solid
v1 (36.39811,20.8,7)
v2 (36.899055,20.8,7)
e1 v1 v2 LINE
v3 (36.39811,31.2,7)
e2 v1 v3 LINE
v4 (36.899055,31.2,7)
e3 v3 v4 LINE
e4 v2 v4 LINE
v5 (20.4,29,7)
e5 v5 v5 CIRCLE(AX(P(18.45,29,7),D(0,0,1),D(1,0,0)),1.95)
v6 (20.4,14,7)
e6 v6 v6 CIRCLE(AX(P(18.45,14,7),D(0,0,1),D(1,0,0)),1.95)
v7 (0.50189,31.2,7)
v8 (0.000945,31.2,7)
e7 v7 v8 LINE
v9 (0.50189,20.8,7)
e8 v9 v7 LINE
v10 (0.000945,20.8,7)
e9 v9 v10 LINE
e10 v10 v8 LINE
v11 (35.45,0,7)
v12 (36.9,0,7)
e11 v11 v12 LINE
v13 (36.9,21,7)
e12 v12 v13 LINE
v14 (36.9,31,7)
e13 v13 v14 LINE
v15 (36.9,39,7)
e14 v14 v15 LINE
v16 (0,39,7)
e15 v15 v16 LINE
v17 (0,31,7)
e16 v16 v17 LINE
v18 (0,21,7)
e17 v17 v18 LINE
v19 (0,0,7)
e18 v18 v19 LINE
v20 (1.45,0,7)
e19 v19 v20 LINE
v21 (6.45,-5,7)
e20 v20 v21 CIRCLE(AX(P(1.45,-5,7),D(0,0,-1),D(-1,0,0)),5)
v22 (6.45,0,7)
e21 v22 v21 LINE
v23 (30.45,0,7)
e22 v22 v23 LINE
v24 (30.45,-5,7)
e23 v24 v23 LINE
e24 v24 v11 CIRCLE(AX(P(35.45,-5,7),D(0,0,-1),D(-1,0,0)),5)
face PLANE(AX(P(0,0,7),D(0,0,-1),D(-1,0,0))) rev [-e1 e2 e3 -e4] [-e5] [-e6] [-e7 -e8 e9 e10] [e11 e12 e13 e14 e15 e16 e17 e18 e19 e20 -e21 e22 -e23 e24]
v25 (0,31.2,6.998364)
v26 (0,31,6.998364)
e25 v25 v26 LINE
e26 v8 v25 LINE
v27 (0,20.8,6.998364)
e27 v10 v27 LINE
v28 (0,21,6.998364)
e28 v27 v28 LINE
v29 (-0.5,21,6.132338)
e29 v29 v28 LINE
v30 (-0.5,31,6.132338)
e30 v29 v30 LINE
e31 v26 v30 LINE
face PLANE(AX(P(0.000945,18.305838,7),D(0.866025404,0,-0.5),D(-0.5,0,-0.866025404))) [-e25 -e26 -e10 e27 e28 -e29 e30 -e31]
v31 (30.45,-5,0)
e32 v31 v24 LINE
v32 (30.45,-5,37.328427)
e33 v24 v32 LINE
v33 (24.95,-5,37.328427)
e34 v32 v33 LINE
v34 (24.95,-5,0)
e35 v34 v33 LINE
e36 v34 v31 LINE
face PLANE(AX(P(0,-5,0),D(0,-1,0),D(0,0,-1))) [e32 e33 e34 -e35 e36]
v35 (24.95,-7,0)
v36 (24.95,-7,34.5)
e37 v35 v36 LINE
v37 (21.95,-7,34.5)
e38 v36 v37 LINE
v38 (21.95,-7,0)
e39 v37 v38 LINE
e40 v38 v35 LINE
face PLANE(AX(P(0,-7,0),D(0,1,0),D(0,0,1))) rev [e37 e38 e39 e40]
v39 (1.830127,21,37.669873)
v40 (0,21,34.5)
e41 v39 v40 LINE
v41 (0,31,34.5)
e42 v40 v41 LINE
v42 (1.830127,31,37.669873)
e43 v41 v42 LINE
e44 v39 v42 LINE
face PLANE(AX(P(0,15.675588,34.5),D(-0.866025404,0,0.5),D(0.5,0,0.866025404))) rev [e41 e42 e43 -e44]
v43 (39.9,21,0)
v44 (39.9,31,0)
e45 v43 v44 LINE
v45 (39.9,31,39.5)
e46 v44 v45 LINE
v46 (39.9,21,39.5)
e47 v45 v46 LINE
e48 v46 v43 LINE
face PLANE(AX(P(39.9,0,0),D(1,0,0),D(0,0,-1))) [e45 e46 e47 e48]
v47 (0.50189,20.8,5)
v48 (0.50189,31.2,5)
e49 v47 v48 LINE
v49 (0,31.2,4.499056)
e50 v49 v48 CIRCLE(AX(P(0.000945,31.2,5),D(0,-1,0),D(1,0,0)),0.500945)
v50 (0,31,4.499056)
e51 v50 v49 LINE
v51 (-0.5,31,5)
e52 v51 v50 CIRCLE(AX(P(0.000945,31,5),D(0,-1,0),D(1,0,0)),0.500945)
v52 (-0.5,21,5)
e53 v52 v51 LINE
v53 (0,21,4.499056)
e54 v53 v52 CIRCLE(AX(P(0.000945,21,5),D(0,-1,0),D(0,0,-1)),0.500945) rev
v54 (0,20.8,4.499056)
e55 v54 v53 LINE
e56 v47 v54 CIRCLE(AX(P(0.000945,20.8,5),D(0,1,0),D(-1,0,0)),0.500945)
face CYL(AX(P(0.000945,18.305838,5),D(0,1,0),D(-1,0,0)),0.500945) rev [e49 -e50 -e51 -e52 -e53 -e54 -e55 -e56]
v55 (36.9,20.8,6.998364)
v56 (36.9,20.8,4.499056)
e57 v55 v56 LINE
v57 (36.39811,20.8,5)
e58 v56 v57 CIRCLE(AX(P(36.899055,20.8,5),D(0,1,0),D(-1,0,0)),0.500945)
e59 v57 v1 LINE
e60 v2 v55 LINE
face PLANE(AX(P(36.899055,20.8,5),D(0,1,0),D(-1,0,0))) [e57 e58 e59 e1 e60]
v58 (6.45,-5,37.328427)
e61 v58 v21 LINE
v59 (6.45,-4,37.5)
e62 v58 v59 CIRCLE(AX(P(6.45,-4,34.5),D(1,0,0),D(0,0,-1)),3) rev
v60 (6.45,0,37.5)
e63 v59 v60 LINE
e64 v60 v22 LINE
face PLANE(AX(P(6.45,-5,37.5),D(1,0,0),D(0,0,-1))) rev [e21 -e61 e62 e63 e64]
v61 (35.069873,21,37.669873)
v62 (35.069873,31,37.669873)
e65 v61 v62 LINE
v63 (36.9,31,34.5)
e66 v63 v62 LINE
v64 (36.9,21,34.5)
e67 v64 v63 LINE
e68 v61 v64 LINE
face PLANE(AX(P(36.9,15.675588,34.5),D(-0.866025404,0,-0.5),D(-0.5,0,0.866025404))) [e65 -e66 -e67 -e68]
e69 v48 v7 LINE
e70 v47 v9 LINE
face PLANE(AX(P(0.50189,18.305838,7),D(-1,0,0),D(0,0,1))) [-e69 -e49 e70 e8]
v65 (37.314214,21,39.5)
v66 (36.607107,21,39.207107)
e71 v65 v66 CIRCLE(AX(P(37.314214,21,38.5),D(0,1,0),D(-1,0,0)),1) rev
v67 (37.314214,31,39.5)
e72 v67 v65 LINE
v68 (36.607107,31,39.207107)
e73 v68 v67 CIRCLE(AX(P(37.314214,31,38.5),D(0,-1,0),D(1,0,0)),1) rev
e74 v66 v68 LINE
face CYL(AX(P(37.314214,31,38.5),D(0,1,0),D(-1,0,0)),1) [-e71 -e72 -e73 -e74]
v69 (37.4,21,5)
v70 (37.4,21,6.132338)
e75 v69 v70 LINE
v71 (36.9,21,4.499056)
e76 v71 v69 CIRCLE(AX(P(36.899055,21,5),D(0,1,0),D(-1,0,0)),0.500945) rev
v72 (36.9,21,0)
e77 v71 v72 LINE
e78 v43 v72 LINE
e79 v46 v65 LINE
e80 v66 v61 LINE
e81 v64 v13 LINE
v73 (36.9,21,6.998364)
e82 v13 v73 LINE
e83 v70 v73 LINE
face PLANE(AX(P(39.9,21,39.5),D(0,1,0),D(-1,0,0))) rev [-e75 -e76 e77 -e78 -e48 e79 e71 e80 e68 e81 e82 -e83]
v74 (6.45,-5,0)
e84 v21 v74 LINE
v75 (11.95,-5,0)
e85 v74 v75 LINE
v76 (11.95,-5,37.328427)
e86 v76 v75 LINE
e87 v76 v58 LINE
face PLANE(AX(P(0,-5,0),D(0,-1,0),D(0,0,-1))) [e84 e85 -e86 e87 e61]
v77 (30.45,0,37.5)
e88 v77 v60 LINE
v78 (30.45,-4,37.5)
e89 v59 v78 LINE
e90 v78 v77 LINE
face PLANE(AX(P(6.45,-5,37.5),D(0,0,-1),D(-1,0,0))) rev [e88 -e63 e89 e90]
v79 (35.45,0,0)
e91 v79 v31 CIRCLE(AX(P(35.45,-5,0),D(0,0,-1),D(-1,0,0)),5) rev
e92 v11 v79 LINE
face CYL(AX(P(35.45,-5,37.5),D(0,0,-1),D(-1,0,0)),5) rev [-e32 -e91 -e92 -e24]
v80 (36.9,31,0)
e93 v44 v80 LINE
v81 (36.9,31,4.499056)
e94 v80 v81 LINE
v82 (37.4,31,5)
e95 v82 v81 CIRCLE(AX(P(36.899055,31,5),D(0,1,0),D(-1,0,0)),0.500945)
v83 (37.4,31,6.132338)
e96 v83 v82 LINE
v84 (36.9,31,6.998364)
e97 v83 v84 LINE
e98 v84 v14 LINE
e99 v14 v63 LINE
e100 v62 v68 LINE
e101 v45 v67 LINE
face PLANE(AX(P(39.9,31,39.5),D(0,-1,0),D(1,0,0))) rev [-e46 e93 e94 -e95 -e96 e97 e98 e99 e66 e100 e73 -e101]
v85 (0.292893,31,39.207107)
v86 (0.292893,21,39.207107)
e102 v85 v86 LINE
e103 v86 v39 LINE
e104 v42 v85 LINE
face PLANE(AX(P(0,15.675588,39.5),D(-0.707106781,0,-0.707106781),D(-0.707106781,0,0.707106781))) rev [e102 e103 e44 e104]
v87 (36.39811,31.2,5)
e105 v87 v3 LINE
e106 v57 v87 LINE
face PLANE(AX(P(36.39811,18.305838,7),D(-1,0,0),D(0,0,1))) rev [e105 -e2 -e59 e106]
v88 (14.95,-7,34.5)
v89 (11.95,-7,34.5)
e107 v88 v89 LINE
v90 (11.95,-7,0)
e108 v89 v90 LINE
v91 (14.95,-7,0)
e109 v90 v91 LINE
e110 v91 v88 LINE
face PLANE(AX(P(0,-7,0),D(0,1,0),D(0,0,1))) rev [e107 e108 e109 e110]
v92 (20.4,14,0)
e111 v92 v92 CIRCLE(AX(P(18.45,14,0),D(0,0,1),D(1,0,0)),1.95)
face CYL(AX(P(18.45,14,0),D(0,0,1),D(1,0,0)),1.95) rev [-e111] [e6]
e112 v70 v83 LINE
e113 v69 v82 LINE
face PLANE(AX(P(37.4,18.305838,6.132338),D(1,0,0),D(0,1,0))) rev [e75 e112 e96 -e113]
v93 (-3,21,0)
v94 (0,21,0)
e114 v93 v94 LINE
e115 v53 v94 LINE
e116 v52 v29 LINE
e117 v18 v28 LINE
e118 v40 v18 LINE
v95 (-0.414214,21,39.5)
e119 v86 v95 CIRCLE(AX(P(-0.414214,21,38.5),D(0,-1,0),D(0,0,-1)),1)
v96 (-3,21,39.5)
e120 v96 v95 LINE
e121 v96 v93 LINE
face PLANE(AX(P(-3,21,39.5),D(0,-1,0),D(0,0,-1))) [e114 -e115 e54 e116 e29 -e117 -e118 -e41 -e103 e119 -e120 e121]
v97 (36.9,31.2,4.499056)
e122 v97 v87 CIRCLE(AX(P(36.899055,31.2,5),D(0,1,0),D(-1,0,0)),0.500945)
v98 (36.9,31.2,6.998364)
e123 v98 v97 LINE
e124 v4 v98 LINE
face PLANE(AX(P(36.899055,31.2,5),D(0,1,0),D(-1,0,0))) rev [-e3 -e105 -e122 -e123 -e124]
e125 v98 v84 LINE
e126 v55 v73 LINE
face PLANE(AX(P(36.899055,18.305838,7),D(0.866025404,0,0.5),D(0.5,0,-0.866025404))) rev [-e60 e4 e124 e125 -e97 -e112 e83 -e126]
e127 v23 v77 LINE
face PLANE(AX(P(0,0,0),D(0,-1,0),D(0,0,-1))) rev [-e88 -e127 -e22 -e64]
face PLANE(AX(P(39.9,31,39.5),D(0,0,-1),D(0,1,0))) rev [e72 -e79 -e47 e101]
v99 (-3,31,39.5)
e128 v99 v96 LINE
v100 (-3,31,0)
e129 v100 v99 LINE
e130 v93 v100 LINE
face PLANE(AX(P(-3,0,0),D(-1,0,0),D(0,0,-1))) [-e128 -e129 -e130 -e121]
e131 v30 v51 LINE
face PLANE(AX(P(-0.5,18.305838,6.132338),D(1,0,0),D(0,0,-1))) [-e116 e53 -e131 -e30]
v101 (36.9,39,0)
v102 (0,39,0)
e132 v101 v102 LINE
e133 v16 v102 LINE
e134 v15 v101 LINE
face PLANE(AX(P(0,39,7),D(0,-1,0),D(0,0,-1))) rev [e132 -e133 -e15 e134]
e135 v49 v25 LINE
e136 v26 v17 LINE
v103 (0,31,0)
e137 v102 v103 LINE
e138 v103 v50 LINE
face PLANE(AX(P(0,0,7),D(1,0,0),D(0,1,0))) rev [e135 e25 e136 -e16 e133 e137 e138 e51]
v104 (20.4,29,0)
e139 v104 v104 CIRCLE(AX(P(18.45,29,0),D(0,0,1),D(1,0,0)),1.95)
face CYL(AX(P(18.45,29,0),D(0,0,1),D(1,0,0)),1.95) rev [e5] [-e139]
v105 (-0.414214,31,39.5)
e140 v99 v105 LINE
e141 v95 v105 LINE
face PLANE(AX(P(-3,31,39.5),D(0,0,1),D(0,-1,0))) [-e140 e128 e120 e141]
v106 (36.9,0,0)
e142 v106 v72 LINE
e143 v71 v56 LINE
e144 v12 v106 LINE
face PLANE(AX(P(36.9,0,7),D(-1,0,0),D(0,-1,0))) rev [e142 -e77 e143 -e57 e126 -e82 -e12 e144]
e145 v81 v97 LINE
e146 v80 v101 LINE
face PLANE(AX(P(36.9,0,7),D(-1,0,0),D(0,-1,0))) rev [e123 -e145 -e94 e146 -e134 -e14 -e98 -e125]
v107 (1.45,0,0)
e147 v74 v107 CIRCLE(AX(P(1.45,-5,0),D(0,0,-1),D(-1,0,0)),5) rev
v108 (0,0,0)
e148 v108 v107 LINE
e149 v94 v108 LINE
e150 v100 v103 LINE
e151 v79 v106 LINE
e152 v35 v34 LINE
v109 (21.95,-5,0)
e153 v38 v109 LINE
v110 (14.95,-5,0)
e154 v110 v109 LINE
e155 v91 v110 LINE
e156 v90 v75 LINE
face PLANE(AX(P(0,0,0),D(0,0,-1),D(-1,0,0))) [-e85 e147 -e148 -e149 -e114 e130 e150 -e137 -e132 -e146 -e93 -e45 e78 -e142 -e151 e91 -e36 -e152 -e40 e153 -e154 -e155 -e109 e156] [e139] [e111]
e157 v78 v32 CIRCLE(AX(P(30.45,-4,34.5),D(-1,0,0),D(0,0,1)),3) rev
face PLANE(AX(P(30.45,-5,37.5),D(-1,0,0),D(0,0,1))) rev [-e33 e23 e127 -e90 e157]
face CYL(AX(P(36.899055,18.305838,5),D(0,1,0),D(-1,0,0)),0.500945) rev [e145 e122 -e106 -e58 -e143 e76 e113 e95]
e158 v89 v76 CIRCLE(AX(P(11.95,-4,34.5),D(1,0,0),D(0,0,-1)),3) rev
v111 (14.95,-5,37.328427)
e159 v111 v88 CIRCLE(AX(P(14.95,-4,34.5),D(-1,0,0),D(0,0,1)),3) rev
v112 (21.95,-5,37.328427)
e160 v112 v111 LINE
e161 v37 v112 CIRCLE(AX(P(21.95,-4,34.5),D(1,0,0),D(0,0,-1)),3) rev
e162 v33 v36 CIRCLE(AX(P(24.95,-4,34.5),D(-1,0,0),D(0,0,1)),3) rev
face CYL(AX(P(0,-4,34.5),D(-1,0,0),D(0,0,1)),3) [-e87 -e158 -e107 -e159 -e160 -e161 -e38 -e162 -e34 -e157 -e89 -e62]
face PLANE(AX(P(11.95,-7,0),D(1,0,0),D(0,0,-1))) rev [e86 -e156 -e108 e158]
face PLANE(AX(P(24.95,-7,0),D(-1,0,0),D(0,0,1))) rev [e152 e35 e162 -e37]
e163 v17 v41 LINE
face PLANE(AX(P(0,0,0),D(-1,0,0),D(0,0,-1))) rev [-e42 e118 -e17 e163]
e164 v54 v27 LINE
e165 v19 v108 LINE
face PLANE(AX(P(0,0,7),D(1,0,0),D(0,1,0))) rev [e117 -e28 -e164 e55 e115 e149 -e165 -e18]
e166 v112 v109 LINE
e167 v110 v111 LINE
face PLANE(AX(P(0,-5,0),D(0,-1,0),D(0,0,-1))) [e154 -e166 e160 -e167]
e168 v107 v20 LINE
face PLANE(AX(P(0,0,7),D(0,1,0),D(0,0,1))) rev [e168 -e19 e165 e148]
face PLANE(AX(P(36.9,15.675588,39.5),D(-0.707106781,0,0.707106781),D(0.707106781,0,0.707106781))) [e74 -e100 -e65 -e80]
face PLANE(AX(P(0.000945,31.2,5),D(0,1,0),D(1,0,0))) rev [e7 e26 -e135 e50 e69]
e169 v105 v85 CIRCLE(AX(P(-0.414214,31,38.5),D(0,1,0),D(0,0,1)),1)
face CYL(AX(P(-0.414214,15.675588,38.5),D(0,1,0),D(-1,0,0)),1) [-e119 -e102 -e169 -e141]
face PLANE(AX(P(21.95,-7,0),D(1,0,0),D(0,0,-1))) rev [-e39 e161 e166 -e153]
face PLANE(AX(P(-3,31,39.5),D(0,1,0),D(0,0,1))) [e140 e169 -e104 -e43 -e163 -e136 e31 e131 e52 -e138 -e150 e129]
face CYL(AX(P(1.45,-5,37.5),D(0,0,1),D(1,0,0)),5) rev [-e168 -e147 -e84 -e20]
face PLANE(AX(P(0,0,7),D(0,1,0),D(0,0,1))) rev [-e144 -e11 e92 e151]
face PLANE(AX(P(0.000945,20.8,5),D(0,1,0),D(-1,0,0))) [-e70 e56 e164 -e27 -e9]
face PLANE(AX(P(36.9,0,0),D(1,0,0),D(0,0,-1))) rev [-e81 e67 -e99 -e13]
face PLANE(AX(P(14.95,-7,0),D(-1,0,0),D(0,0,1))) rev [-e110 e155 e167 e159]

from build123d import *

# Parameters (mm, degrees)
SKETCH_1_W          = 36.9
SKETCH_1_H          = 39
EXTRUDE_1_DEPTH     = 7
SKETCH_2_W          = 24
SKETCH_2_H          = 37.5
EXTRUDE_2_DEPTH     = 5
SKETCH_4_W          = 39.5
SKETCH_4_H          = 10
EXTRUDE_3_DEPTH     = 3
EXTRUDE_4_DEPTH     = 10
CUT_EXTRUDE_3_DEPTH = 10
CUT_EXTRUDE_START   = 0.2
CUT_EXTRUDE_4_DEPTH = 0.2
CUT_EXTRUDE_START_2 = -10
CUT_EXTRUDE_5_DEPTH = 0.2
FILLET_1_R          = 5
FILLET_2_R          = 1
MIRROR_START        = 20.8
MIRROR_4_DEPTH      = 10.4
MIRROR_START_2      = 21
MIRROR_4_2_DEPTH    = 10
FILLET_3_R          = 1
SKETCH_7_W          = 3
SKETCH_7_H          = 37.5
EXTRUDE_5_DEPTH     = 2
FILLET_4_R          = 3
SKETCH_8_R          = 1.95
CUT_EXTRUDE_6_DEPTH = 65.569807186


# Read off the part's stored shape, not the designer's step: 鏡射4
with BuildPart() as part:
    # 草圖1 → 填料-伸長1 (new body)
    with BuildSketch(Plane.XY):
        with Locations((18.45, 19.5)):
            Rectangle(SKETCH_1_W, SKETCH_1_H)
    extrude(amount=EXTRUDE_1_DEPTH)

    # 草圖2 → 填料-伸長2 (add)
    with BuildSketch(Plane.XZ):
        with Locations((18.45, 18.75)):
            Rectangle(SKETCH_2_W, SKETCH_2_H)
    extrude(amount=EXTRUDE_2_DEPTH)

    # 草圖4 → 填料-伸長3 (add)
    with BuildSketch(Plane(origin=(36.9, 0, 0), x_dir=(0, 0, -1), z_dir=(1, 0, 0))):
        with Locations((-19.75, 26)):
            Rectangle(SKETCH_4_W, SKETCH_4_H)
    extrude(amount=EXTRUDE_3_DEPTH)

    # 草圖5 → 填料-伸長4 (add)
    with BuildSketch(Plane(origin=(0, 31, 0), x_dir=(1, 0, 0), z_dir=(0, 1, 0))):
        Polygon((36.9, -39.5), (35.069872981, -37.669872981), (36.9, -34.5), align=None)
    extrude(amount=-EXTRUDE_4_DEPTH)

    # 草圖6 → 除料-伸長3 (cut)
    with BuildSketch(Plane(origin=(0, 31, 0), x_dir=(1, 0, 0), z_dir=(0, 1, 0))):
        with BuildLine():
            Line((36.398110453, -7), (36.899055226, -7))
            Line((36.899055226, -7), (37.4, -6.1323382))
            Line((37.4, -6.1323382), (37.4, -5))
            ThreePointArc((37.4, -5), (36.899055226, -4.499055226), (36.398110453, -5))
            Line((36.398110453, -5), (36.398110453, -7))
        make_face()
    extrude(amount=-CUT_EXTRUDE_3_DEPTH, mode=Mode.SUBTRACT)

    # 草圖6<2> → 除料-伸長4 (cut)
    with BuildSketch(Plane(origin=(0, 31, 0), x_dir=(1, 0, 0), z_dir=(0, 1, 0)).offset(CUT_EXTRUDE_START)):
        with BuildLine():
            Line((36.398110453, -7), (36.899055226, -7))
            Line((36.899055226, -7), (37.4, -6.1323382))
            Line((37.4, -6.1323382), (37.4, -5))
            ThreePointArc((37.4, -5), (36.899055226, -4.499055226), (36.398110453, -5))
            Line((36.398110453, -5), (36.398110453, -7))
        make_face()
    extrude(amount=-CUT_EXTRUDE_4_DEPTH, mode=Mode.SUBTRACT)

    # 草圖6<3> → 除料-伸長5 (cut)
    with BuildSketch(Plane(origin=(0, 31, 0), x_dir=(1, 0, 0), z_dir=(0, 1, 0)).offset(CUT_EXTRUDE_START_2)):
        with BuildLine():
            Line((36.398110453, -7), (36.899055226, -7))
            Line((36.899055226, -7), (37.4, -6.1323382))
            Line((37.4, -6.1323382), (37.4, -5))
            ThreePointArc((37.4, -5), (36.899055226, -4.499055226), (36.398110453, -5))
            Line((36.398110453, -5), (36.398110453, -7))
        make_face()
    extrude(amount=-CUT_EXTRUDE_5_DEPTH, mode=Mode.SUBTRACT)

    # 圓角1
    fillet_1_edges = [part.edges().sort_by_distance(p)[0] for p in [
        (6.45, 0, 3.5),
        (30.45, 0, 3.5),
    ]]
    fillet(fillet_1_edges, radius=FILLET_1_R - 0.0001)  # a hair under: the kernel refuses the full size

    # 圓角2
    fillet_2_edges = [part.edges().sort_by_distance(p)[0] for p in [
        (36.9, 26, 39.5),
    ]]
    fillet(fillet_2_edges, radius=FILLET_2_R)

    # 鏡射4 outline → 鏡射4 (cut)
    with BuildSketch(Plane(origin=(0, 0, 0), x_dir=(1, 0, 0), z_dir=(0, 1, 0)).offset(MIRROR_START)):
        with BuildLine():
            Line((0, -4.499056117), (0, -6.998363603))
            Line((0, -6.998363603), (0.000944774, -7))
            Line((0.000944774, -7), (0.501889547, -7))
            Line((0.501889547, -7), (0.501889547, -5))
            ThreePointArc((0.501889547, -5), (0.354832035, -4.645444683), (0, -4.499056117))
        make_face()
    extrude(amount=MIRROR_4_DEPTH, mode=Mode.SUBTRACT)

    # Mirror 4 2 outline → Mirror 4 2 (add)
    with BuildSketch(Plane(origin=(0, 0, 0), x_dir=(1, 0, 0), z_dir=(0, 1, 0)).offset(MIRROR_START_2)):
        with BuildLine():
            Line((0, -34.5), (0, -6.998363603))
            Line((0, -6.998363603), (-0.5, -6.1323382))
            Line((-0.5, -6.1323382), (-0.5, -5))
            ThreePointArc((-0.5, -5), (-0.353610544, -4.646112739), (0, -4.499056117))
            Line((0, -4.499056117), (0, 0))
            Line((0, 0), (-3, 0))
            Line((-3, 0), (-3, -39.5))
            Line((-3, -39.5), (0, -39.5))
            Line((0, -39.5), (1.830127019, -37.669872981))
            Line((1.830127019, -37.669872981), (0, -34.5))
        make_face()
    extrude(amount=MIRROR_4_2_DEPTH)

    # 圓角3
    fillet_3_edges = [part.edges().sort_by_distance(p)[0] for p in [
        (0, 26, 39.5),
    ]]
    fillet(fillet_3_edges, radius=FILLET_3_R)

    # 草圖7 → 填料-伸長5 (add)
    with BuildSketch(Plane.XZ.offset(5)):
        with Locations((13.45, 18.75)):
            Rectangle(SKETCH_7_W, SKETCH_7_H)
        with Locations((23.45, 18.75)):
            Rectangle(SKETCH_7_W, SKETCH_7_H)
    extrude(amount=EXTRUDE_5_DEPTH)

    # 圓角4
    fillet_4_edges = [part.edges().sort_by_distance(p)[0] for p in [
        (13.45, -7, 37.5),
    ]]
    fillet(fillet_4_edges, radius=FILLET_4_R)

    # 草圖8 → 除料-伸長6 (cut, through all)
    with BuildSketch(Plane.XY.offset(7)):
        with Locations((18.45, 29)):
            Circle(SKETCH_8_R)
        with Locations((18.45, 14)):
            Circle(SKETCH_8_R)
    extrude(amount=-CUT_EXTRUDE_6_DEPTH, mode=Mode.SUBTRACT)


solid = part.part
